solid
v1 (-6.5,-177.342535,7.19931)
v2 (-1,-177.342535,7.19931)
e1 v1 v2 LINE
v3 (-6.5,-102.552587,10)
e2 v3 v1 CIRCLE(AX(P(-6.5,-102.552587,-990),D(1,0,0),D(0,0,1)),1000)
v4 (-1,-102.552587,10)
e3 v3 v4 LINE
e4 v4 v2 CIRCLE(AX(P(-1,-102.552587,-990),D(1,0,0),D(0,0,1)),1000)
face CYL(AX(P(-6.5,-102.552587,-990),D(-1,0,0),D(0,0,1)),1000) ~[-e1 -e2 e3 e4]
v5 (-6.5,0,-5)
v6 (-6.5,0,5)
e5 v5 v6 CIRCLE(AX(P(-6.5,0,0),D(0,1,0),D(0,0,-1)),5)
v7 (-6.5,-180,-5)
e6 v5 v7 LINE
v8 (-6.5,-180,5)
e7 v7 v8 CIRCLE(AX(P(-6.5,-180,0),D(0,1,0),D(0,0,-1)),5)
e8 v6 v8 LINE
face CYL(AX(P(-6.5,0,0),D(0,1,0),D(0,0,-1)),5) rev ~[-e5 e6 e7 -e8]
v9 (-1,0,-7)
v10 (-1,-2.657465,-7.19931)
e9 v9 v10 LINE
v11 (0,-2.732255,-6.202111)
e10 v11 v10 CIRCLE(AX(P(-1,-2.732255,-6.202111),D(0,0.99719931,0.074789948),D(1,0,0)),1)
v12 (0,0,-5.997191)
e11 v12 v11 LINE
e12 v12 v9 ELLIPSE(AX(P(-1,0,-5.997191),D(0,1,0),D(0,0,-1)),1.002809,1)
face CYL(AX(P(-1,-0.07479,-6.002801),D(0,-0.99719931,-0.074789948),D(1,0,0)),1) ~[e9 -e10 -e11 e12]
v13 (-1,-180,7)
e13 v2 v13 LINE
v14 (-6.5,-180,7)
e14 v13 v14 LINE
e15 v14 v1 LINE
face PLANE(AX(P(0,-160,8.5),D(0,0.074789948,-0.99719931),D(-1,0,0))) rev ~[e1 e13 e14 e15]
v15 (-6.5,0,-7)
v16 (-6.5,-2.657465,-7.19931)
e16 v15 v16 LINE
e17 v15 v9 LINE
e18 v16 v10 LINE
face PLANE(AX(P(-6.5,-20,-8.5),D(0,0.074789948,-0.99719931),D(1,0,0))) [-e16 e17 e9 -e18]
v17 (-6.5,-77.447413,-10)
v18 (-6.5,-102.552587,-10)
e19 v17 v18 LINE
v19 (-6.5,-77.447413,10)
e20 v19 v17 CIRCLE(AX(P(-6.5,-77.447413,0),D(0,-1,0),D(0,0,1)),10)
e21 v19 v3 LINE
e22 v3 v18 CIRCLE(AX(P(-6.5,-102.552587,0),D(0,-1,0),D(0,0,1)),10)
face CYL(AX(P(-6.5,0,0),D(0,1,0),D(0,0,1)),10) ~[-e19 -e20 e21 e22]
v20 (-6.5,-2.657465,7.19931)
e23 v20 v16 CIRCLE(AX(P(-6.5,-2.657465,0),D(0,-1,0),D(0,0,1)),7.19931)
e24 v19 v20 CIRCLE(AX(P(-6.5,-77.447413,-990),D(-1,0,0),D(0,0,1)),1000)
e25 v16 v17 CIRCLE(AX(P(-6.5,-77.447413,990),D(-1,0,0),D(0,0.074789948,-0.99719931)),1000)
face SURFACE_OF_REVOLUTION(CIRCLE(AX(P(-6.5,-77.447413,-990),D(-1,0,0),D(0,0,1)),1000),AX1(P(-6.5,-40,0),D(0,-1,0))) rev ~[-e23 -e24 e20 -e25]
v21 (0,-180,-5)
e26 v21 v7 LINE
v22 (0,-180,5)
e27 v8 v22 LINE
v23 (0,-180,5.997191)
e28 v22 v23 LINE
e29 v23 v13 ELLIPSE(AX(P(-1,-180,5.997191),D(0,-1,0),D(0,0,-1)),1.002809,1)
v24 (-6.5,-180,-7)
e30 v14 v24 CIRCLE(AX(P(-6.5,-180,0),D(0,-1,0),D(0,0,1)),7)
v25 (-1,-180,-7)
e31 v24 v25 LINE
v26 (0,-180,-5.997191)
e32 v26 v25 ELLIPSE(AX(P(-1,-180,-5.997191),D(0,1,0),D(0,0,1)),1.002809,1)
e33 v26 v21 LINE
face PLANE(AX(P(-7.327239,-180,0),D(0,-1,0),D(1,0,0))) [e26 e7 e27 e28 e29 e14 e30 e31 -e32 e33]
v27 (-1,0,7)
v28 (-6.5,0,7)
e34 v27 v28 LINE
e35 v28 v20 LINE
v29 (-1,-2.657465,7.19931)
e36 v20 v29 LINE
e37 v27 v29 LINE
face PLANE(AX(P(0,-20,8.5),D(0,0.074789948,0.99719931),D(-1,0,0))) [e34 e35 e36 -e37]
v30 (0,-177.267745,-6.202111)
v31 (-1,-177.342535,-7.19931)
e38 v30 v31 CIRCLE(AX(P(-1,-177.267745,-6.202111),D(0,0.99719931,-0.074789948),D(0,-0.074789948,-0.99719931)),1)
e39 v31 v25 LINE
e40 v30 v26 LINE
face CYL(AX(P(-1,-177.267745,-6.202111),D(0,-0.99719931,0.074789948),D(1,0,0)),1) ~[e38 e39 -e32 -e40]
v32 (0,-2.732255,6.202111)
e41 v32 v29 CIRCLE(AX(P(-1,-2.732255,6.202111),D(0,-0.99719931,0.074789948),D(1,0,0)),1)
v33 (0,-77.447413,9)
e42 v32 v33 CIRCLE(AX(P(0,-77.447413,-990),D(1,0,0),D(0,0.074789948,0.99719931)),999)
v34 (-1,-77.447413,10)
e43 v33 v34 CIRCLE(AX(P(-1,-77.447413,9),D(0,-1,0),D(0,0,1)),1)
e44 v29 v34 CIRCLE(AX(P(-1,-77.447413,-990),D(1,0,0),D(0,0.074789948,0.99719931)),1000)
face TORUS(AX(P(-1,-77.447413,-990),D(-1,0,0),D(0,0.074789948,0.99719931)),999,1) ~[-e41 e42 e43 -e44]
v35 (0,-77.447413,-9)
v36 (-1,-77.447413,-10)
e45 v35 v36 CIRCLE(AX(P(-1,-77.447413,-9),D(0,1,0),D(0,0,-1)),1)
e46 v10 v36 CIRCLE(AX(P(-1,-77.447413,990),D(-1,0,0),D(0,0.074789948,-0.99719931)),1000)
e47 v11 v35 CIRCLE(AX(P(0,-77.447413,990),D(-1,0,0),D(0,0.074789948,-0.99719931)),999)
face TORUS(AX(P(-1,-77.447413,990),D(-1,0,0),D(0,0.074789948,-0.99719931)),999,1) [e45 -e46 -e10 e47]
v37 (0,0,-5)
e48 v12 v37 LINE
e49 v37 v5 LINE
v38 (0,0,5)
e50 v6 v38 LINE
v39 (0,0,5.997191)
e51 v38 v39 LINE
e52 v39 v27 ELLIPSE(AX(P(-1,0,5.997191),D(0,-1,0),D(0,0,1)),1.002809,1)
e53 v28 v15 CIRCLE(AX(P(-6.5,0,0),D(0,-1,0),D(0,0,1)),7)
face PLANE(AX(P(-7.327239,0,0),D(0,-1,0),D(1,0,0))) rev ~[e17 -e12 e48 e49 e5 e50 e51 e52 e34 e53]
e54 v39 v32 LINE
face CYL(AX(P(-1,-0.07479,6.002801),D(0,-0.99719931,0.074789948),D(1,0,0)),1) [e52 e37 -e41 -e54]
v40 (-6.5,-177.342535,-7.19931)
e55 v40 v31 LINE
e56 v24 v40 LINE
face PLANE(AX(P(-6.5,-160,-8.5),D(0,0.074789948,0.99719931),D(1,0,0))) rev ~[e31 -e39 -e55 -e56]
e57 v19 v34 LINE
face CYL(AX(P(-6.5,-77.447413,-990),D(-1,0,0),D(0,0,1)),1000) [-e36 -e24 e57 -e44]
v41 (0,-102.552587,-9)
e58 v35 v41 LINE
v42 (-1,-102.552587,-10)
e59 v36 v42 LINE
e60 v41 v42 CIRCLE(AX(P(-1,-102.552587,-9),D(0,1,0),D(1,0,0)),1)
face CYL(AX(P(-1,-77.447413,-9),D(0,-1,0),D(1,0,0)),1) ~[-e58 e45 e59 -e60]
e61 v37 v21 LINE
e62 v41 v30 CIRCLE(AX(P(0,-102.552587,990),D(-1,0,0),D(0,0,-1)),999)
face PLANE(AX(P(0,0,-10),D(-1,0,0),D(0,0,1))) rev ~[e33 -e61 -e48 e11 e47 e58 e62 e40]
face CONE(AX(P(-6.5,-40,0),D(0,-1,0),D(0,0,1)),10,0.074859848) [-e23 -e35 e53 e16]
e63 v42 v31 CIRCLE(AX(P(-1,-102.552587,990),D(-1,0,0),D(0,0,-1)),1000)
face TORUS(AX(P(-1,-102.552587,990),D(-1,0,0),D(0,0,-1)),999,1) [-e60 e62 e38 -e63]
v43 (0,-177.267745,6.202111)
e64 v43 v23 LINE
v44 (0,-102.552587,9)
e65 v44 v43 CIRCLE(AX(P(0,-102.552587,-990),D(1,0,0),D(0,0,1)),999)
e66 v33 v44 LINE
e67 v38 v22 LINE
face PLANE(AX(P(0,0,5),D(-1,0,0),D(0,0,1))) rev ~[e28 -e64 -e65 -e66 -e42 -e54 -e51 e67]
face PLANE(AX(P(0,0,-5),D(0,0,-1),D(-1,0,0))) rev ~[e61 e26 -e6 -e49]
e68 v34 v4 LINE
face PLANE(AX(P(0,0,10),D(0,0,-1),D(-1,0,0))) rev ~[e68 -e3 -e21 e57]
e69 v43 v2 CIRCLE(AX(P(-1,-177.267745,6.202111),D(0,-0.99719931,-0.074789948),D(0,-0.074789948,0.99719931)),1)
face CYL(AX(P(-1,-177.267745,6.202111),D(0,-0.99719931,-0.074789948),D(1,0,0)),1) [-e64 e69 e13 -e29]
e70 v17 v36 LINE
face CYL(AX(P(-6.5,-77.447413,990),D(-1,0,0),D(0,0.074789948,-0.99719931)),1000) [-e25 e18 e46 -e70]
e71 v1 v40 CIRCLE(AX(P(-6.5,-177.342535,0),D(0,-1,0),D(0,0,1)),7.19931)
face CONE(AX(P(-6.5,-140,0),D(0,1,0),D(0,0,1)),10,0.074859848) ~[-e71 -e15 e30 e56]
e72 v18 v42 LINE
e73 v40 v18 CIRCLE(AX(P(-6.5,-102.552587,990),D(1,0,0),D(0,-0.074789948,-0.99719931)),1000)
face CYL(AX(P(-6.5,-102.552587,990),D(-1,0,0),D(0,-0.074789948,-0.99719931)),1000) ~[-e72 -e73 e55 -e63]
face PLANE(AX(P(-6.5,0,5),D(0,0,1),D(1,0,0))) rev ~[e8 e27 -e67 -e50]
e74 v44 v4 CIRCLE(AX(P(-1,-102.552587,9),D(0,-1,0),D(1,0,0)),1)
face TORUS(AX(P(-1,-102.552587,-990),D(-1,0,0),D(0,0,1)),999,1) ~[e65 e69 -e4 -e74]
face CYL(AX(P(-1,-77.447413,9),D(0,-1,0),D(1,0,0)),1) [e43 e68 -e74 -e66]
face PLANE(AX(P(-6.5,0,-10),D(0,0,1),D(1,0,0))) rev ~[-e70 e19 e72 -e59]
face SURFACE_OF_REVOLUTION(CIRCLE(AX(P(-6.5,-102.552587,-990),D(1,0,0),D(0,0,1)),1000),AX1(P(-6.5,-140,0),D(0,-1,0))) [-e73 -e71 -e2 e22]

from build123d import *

# Parameters (mm, degrees)
F1_DEPTH    = 180
F2_SIZE2    = 40
F2_SIZE     = 3
F2_2_SIZE2  = 40
F2_2_SIZE   = 3
F3_T1_DEPTH = 100.1185335526
F3_T4_ANGLE = 180
F3_T6_ANGLE = 180
F4_R        = 1


# Not quite as in the source:
# - a fillet or chamfer that OpenCascade refuses, or shapes differently, is made with other operations: its cross-section is extruded or revolved along the edge and cut away or added


with BuildPart() as f1:
    # F0 (on Front) → F1 (new body)
    with BuildSketch(Plane.XZ):
        with BuildLine():
            Line((-6.5, 5), (-2.1602540378, 5))
            Line((-2.1602540378, 5), (0, 5))
            Line((0, 5), (0, 7.5993420768))
            Line((0, 7.5993420768), (0, 10))
            Line((0, 10), (-6.5, 10))
            ThreePointArc((-6.5, 10), (-16.5, 0), (-6.5, -10))
            Line((-6.5, -10), (0, -10))
            Line((0, -10), (0, -7.5993420768))
            Line((0, -7.5993420768), (0, -5))
            Line((0, -5), (-2.1602540378, -5))
            Line((-2.1602540378, -5), (-6.5, -5))
            ThreePointArc((-6.5, -5), (-11.5, 0), (-6.5, 5))
        make_face()
    extrude(amount=F1_DEPTH)

    # F2
    f2_edges = [f1.edges().sort_by_distance(p)[0] for p in [
        (-3.25, -180, 10),
    ]]
    f2_side = f1.faces().sort_by_distance((-11.759278, -180, 0))[0]
    chamfer(f2_edges, length=F2_SIZE, length2=F2_SIZE2, reference=f2_side)

    # F2#2
    f2_2_edges = [f1.edges().sort_by_distance(p)[0] for p in [
        (-3.25, 0, 10),
    ]]
    f2_2_side = f1.faces().sort_by_distance((-11.759278, 0, 0))[0]
    chamfer(f2_2_edges, length=F2_2_SIZE, length2=F2_2_SIZE2, reference=f2_2_side)

    # F3: fillet of radius 1000 on 2 edges, made by hand

    # F3_s2 → F3_t1 (cut)
    with BuildSketch(Plane.YZ.offset(-6.5)):
        with BuildLine():
            ThreePointArc((-102.5525865789, 10), (-139.9737711643, 9.2995821796), (-177.3425348206, 7.1993098885))
            Line((-177.3425348206, 7.1993098885), (-140, 10))
            Line((-140, 10), (-102.5525865789, 10))
        make_face()
        with BuildLine():
            ThreePointArc((-77.4474134211, 10), (-40.0262288357, 9.2995821796), (-2.6574651794, 7.1993098885))
            Line((-2.6574651794, 7.1993098885), (-40, 10))
            Line((-40, 10), (-77.4474134211, 10))
        make_face()
        with BuildLine():
            ThreePointArc((-2.6574651794, -7.1993098885), (-40.0262288357, -9.2995821796), (-77.4474134211, -10))
            Line((-77.4474134211, -10), (-40, -10))
            Line((-40, -10), (-2.6574651794, -7.1993098885))
        make_face()
        with BuildLine():
            ThreePointArc((-177.3425348206, -7.1993098885), (-139.9737711643, -9.2995821796), (-102.5525865789, -10))
            Line((-102.5525865789, -10), (-140, -10))
            Line((-140, -10), (-177.3425348206, -7.1993098885))
        make_face()
    extrude(amount=F3_T1_DEPTH, mode=Mode.SUBTRACT)

    # F3_s3 → F3_t4 (revolve, cut)
    with BuildSketch(Plane.YZ.offset(-6.5)):
        with BuildLine():
            ThreePointArc((-77.4474134211, 10), (-40.0262288357, 9.2995821796), (-2.6574651794, 7.1993098885))
            Line((-2.6574651794, 7.1993098885), (-40, 10))
            Line((-40, 10), (-77.4474134211, 10))
        make_face()
    revolve(axis=Axis((-6.5, -40, 0), (0, -1, 0)), revolution_arc=F3_T4_ANGLE, mode=Mode.SUBTRACT)

    # F3_s5 → F3_t6 (revolve, cut)
    with BuildSketch(Plane.YZ.offset(-6.5)):
        with BuildLine():
            ThreePointArc((-102.5525865789, 10), (-139.9737711643, 9.2995821796), (-177.3425348206, 7.1993098885))
            Line((-177.3425348206, 7.1993098885), (-140, 10))
            Line((-140, 10), (-102.5525865789, 10))
        make_face()
    revolve(axis=Axis((-6.5, -140, 0), (0, -1, 0)), revolution_arc=F3_T6_ANGLE, mode=Mode.SUBTRACT)

    # F4
    f4_edges = [f1.edges().sort_by_distance(p)[0] for p in [
        (0, -90, 10),
        (0, -90, -10),
    ]]
    fillet(f4_edges, radius=F4_R)


solid = f1.part
